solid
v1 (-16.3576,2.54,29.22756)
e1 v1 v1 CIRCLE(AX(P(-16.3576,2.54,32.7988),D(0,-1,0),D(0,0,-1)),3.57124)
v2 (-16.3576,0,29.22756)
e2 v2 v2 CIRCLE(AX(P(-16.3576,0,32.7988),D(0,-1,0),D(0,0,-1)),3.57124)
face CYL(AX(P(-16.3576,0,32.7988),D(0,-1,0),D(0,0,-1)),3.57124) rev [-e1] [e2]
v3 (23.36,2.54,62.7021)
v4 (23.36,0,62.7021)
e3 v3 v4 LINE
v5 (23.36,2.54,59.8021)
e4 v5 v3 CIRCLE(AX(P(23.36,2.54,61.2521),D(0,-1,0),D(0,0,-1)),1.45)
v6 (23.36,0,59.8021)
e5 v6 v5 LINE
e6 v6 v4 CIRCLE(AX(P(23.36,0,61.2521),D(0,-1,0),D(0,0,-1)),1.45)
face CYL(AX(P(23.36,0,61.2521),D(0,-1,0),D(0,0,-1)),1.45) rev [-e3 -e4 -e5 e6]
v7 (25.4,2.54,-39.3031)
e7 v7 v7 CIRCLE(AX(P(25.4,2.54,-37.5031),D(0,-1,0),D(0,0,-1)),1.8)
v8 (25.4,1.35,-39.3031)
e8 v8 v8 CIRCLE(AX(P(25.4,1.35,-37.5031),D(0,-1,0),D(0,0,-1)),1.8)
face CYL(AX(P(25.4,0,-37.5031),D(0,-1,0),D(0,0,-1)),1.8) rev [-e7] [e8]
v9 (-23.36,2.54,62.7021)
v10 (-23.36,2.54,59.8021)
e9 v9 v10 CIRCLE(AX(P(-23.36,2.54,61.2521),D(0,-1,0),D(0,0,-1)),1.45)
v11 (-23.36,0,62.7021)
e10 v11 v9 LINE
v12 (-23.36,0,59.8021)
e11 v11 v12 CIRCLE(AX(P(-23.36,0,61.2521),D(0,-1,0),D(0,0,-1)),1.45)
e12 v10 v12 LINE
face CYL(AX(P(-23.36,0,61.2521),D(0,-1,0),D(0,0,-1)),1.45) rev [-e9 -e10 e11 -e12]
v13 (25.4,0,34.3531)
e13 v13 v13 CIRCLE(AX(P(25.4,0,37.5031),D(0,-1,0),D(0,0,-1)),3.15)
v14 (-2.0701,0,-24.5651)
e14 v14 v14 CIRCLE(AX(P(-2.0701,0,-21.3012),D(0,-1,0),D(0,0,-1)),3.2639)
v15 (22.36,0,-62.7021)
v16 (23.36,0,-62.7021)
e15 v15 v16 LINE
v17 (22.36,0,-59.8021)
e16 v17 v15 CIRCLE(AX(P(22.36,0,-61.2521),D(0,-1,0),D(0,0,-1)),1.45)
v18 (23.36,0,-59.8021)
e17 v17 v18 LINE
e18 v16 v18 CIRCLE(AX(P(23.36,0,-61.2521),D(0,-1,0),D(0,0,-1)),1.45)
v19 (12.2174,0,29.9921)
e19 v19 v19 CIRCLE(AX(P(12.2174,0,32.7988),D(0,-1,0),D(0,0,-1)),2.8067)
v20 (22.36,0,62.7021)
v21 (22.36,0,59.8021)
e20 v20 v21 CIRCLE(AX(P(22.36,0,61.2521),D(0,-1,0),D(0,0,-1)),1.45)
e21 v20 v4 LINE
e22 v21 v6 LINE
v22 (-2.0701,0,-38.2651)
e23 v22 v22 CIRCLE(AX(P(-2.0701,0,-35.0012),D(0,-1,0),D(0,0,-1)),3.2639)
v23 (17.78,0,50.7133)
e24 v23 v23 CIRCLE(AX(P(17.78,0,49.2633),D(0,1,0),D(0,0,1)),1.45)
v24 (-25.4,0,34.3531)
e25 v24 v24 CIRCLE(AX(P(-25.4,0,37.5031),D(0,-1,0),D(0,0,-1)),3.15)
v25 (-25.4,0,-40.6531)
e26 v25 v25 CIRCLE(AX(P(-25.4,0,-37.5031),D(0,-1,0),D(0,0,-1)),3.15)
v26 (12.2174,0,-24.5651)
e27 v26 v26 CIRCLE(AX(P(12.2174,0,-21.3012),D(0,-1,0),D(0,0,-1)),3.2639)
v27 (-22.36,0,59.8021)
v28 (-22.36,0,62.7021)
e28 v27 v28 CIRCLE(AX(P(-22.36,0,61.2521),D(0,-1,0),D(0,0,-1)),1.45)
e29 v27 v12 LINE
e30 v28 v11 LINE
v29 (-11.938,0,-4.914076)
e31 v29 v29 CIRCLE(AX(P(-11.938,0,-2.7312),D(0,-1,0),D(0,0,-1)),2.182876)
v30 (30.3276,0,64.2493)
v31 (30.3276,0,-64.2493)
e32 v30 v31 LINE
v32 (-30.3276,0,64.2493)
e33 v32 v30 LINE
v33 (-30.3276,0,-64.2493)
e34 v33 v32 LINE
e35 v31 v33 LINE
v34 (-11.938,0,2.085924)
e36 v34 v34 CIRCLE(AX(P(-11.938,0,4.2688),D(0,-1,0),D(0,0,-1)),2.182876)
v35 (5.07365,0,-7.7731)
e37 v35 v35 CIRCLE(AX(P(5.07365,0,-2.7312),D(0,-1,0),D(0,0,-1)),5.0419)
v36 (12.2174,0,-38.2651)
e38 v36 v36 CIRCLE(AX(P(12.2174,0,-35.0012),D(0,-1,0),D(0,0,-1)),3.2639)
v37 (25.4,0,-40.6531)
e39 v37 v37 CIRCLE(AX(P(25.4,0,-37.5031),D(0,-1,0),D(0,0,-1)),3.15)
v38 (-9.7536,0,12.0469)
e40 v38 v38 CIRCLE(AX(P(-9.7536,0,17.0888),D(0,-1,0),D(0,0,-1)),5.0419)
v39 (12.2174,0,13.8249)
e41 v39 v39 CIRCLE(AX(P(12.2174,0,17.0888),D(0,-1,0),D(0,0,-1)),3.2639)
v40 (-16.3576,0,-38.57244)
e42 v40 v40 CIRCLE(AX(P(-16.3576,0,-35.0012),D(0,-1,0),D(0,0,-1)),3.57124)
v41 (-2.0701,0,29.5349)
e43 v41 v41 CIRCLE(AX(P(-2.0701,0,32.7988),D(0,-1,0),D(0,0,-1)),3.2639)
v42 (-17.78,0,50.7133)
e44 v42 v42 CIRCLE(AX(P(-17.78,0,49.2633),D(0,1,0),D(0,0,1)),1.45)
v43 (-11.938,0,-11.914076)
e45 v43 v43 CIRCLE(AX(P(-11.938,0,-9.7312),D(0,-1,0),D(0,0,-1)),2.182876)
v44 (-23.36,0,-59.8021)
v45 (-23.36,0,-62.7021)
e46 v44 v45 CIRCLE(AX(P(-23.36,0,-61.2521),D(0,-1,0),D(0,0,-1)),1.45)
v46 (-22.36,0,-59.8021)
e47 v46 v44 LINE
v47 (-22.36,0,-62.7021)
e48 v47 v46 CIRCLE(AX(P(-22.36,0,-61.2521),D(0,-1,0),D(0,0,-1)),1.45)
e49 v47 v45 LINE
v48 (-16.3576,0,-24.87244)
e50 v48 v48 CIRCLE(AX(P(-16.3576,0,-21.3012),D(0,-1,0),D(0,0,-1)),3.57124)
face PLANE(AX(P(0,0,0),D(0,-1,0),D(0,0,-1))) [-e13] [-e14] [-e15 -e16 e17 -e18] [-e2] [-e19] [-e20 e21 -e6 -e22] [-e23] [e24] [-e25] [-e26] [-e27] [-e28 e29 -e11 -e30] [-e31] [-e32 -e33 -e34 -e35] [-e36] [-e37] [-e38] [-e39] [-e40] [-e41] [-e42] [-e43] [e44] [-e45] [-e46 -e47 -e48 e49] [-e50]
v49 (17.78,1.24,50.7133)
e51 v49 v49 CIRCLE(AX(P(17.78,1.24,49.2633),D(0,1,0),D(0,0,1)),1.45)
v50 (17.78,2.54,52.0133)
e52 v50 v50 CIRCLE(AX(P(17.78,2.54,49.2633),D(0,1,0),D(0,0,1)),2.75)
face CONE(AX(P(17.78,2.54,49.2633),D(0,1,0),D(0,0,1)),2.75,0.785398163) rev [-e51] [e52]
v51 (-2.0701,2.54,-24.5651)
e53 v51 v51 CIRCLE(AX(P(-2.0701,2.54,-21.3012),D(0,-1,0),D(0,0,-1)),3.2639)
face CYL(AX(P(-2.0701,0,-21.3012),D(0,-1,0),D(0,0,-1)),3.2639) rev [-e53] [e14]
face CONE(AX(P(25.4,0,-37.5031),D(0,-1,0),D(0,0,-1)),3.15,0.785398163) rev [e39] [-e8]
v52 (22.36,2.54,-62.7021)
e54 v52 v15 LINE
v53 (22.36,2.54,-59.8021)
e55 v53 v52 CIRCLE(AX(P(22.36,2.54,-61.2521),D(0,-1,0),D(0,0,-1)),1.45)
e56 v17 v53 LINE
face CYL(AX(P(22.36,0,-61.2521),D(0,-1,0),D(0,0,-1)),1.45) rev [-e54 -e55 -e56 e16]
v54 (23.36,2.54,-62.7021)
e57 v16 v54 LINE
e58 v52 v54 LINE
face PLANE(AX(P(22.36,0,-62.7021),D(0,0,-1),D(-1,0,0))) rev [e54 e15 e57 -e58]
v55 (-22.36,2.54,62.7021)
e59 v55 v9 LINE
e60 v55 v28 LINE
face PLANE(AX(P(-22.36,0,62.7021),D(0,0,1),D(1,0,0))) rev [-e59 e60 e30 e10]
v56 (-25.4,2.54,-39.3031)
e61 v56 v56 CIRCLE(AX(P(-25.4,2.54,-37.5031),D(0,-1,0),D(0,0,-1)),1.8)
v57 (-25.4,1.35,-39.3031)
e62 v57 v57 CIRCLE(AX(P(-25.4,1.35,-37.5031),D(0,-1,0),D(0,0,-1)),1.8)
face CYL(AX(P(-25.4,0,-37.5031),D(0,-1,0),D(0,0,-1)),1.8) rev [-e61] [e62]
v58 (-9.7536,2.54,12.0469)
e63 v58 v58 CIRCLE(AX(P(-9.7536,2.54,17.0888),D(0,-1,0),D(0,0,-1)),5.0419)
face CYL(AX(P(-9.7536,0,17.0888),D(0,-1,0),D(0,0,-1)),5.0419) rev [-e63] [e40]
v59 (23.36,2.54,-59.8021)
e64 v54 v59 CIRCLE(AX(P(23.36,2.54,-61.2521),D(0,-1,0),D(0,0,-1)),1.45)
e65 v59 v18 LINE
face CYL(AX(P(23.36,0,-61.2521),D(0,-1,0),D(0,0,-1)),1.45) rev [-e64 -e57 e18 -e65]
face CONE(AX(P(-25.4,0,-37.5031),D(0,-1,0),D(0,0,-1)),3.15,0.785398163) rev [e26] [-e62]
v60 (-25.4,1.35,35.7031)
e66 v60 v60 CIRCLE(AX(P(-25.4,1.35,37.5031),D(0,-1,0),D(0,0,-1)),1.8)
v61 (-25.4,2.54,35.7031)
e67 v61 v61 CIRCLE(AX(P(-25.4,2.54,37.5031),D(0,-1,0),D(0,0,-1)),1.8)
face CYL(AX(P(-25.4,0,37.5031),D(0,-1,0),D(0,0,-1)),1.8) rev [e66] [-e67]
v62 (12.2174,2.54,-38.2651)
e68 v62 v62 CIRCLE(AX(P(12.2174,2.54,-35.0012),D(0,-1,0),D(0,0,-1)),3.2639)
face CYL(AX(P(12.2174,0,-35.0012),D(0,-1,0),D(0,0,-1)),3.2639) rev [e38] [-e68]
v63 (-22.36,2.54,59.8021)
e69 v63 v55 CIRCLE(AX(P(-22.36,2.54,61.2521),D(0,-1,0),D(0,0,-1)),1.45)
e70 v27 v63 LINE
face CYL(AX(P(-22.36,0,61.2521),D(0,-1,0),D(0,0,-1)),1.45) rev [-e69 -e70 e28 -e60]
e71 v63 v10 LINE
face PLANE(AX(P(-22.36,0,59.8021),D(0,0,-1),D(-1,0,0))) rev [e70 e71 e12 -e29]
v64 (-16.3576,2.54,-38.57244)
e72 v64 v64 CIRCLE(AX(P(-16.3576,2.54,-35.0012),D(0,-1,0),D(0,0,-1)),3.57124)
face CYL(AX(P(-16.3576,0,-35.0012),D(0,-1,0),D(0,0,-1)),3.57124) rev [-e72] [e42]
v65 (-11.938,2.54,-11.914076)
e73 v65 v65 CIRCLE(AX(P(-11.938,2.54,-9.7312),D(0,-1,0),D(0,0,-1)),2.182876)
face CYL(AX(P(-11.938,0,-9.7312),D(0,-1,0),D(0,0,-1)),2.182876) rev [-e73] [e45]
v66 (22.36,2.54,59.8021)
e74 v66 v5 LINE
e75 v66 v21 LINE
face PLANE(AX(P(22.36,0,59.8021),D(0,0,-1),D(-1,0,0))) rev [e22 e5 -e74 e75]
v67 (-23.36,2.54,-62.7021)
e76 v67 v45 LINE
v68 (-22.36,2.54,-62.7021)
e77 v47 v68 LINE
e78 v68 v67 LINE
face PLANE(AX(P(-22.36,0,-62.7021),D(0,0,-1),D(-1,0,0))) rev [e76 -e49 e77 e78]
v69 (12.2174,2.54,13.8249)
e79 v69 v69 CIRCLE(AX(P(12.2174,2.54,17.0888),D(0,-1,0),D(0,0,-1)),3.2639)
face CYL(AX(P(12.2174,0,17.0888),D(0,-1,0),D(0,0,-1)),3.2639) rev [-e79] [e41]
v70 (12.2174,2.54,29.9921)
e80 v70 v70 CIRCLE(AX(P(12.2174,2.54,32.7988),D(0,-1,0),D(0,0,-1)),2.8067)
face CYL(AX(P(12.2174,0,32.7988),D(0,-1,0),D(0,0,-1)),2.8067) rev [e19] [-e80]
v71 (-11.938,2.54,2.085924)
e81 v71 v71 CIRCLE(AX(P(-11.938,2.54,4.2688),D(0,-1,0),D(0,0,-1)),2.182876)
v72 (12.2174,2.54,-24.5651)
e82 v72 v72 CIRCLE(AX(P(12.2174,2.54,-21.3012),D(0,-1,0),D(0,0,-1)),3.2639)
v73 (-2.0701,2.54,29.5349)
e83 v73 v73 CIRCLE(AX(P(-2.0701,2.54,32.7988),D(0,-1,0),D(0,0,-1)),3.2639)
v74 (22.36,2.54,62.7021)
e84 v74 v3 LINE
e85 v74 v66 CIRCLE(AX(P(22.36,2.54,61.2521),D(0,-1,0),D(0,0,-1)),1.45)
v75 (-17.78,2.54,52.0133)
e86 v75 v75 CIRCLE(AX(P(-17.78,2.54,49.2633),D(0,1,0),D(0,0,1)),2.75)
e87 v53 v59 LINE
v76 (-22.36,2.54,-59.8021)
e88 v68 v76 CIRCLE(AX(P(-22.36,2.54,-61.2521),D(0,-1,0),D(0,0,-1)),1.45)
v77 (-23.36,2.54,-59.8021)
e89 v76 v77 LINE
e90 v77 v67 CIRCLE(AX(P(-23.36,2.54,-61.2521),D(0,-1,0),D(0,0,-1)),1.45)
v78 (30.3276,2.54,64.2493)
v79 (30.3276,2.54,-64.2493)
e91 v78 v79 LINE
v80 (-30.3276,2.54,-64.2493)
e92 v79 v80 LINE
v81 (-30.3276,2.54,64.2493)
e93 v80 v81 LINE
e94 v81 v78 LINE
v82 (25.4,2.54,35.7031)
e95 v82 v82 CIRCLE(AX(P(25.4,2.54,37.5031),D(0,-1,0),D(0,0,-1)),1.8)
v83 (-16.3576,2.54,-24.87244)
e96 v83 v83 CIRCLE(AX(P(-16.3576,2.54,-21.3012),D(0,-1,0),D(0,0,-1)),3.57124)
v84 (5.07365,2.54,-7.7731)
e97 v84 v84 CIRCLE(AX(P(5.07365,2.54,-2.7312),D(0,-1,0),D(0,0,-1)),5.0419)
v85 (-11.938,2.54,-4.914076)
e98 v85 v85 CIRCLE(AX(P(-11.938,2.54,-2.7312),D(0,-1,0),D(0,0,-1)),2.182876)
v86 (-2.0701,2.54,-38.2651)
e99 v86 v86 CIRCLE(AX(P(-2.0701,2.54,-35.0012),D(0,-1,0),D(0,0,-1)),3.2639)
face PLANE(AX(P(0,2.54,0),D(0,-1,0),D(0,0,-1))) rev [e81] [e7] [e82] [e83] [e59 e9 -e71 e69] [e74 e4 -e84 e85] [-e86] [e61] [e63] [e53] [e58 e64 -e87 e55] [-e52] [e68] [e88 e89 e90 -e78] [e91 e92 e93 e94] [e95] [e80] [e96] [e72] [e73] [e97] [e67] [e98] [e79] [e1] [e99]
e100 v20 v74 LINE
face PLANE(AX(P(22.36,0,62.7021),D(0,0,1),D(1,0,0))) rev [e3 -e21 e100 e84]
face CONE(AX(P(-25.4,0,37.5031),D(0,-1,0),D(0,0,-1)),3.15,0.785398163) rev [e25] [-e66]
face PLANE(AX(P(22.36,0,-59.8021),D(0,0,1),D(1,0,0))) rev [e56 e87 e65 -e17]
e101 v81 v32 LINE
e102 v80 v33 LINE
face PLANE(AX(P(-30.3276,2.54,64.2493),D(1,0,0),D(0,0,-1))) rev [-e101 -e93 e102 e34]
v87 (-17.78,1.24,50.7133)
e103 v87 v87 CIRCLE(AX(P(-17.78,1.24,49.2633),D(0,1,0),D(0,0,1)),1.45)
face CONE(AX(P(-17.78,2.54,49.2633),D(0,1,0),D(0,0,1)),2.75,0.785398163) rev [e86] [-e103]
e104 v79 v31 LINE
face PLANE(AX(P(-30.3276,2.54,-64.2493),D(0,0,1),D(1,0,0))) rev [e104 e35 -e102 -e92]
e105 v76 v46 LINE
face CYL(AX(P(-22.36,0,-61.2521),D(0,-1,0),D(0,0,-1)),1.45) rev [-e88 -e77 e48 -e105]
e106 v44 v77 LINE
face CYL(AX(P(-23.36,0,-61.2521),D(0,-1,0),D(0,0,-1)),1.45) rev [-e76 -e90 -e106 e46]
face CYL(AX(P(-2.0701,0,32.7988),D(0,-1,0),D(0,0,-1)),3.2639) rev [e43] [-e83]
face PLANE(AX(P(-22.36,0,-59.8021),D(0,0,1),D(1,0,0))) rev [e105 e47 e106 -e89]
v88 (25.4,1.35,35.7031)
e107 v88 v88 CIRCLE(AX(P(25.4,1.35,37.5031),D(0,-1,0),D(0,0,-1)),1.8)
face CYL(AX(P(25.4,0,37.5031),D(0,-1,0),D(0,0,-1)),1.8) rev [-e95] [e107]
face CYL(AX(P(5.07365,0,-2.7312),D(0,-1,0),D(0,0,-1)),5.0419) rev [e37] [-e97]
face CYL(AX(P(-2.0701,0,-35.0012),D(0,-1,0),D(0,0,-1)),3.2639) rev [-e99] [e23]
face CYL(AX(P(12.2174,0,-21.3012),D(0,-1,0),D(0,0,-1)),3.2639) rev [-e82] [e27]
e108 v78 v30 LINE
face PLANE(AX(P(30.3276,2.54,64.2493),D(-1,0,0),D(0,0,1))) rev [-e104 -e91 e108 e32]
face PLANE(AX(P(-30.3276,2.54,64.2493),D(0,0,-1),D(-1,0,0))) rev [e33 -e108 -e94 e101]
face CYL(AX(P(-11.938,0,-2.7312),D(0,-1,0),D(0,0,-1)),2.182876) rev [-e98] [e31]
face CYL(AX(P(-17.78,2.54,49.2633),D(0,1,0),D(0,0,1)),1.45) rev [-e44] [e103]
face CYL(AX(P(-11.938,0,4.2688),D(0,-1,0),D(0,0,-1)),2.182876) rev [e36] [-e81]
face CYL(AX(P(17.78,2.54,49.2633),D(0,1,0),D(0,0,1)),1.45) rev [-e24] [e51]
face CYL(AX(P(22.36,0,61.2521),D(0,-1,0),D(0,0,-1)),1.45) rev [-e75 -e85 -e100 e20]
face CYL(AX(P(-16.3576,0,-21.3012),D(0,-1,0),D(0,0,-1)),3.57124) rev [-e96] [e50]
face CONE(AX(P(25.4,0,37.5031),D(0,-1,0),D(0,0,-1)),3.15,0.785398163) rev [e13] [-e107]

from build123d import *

# Parameters (mm, degrees)
SKETCH1_W                                      = 60.6552
SKETCH1_H                                      = 128.4986
BOSS_EXTRUDE1_DEPTH                            = 2.54
CSK_FOR_M3_FLAT_HEAD_MACHINE_SCREW1_AT_2_COUNT = 2
CSK_FOR_M3_FLAT_HEAD_MACHINE_SCREW1_AT_2_PITCH = 75.0062
M2_5_CLEARANCE_SLOT1_DEPTH                     = 2.54
F_1_4_CLEARANCE_HOLE1_D                        = 7.14248
F_1_4_CLEARANCE_HOLE2_D                        = 6.5278
F_3_8_CLEARANCE_HOLE2_D                        = 10.0838
F_10_CLEARANCE_HOLE1_D                         = 5.6134
CSK_FOR_M2_5_FLAT_HEAD_MACHINE_SCREW1_AT_COUNT = 2
CSK_FOR_M2_5_FLAT_HEAD_MACHINE_SCREW1_AT_PITCH = 35.56
F_11_64_0_17188_DIAMETER_HOLE1_D               = 4.365752


# Read off the part's stored shape, not the designer's step: M2.5 Clearance Slot1
with BuildPart() as part:
    # Sketch1 → Boss-Extrude1 (new body)
    with BuildSketch(Plane(origin=(0, 0, 0), x_dir=(1, 0, 0), z_dir=(0, 1, 0))):
        Rectangle(SKETCH1_W, SKETCH1_H)
    extrude(amount=BOSS_EXTRUDE1_DEPTH)

    # Sketch5 → CSK for M3 Flat Head Machine Screw1 (revolve, cut)
    with BuildSketch(Plane(origin=(25.4, 0, -37.5031), x_dir=(0, 0, -1), z_dir=(1, 0, 0))):
        Polygon((0, 0), (0, 2.54), (1.8, 2.54), (1.8, 1.35), (3.15, 0), align=None)
    csk_for_m3_flat_head_machine_screw1 = revolve(axis=Axis((25.4, -6.35, -37.5031), (0, 1, 0)), mode=Mode.SUBTRACT)

    # CSK for M3 Flat Head Machine Screw1 at 2: CSK for M3 Flat Head Machine Screw1 ×2
    with Locations(*[(0, 0, i * CSK_FOR_M3_FLAT_HEAD_MACHINE_SCREW1_AT_2_PITCH) for i in range(1, CSK_FOR_M3_FLAT_HEAD_MACHINE_SCREW1_AT_2_COUNT)]):
        add(csk_for_m3_flat_head_machine_screw1, mode=Mode.SUBTRACT)

    # M2.5 Clearance Slot1 outline → M2.5 Clearance Slot1 (cut)
    with BuildSketch(Plane(origin=(0, 0, 0), x_dir=(1, 0, 0), z_dir=(0, 1, 0))):
        with BuildLine():
            ThreePointArc((23.36, -62.7021), (24.81, -61.2521), (23.36, -59.8021))
            Line((23.36, -59.8021), (22.36, -59.8021))
            ThreePointArc((22.36, -59.8021), (20.91, -61.2521), (22.36, -62.7021))
            Line((22.36, -62.7021), (23.36, -62.7021))
        make_face()
        with BuildLine():
            ThreePointArc((23.36, 59.8021), (24.81, 61.2521), (23.36, 62.7021))
            Line((23.36, 62.7021), (22.36, 62.7021))
            ThreePointArc((22.36, 62.7021), (20.91, 61.2521), (22.36, 59.8021))
            Line((22.36, 59.8021), (23.36, 59.8021))
        make_face()
    m2_5_clearance_slot1 = extrude(amount=M2_5_CLEARANCE_SLOT1_DEPTH, mode=Mode.SUBTRACT)

    # Mirror1: CSK for M3 Flat Head Machine Screw1, M2.5 Clearance Slot1 across plane
    add(csk_for_m3_flat_head_machine_screw1.mirror(Plane(origin=(0, 0, 0), x_dir=(0, 0, 1), z_dir=(1, 0, 0))), mode=Mode.SUBTRACT)
    add(m2_5_clearance_slot1.mirror(Plane(origin=(0, 0, 0), x_dir=(0, 0, 1), z_dir=(1, 0, 0))), mode=Mode.SUBTRACT)

    # Mirror1 copy 1 sketch → Mirror1 copy 1 (revolve, cut)
    with BuildSketch(Plane(origin=(-25.4, 0, 37.5031), x_dir=(0, 0, -1), z_dir=(-1, 0, 0))):
        Polygon((0, 0), (0, -2.54), (1.8, -2.54), (1.8, -1.35), (3.15, 0), align=None)
    revolve(axis=Axis((-25.4, -6.35, 37.5031), (0, -1, 0)), mode=Mode.SUBTRACT)

    # 1/4 Clearance Hole1 (through all)
    with Locations(Plane(origin=(0, 0, 0), x_dir=(-1, 0, 0), z_dir=(0, -1, 0))):
        with Locations((16.3576, 35.0012), (16.3576, 21.301199968), (16.3576, -32.798800036)):
            Hole(F_1_4_CLEARANCE_HOLE1_D / 2)

    # 1/4 Clearance Hole2 (through all)
    with Locations(Plane(origin=(0, 0, 0), x_dir=(-1, 0, 0), z_dir=(0, -1, 0))):
        with Locations((-12.2174, 35.0012), (2.0701, 35.0012), (2.0701, 21.301199968), (-12.2174, 21.301199968), (-12.2174, -17.08879996), (2.0701, -32.798800036)):
            Hole(F_1_4_CLEARANCE_HOLE2_D / 2)

    # 3/8 Clearance Hole2 (through all)
    with Locations(Plane(origin=(0, 0, 0), x_dir=(-1, 0, 0), z_dir=(0, -1, 0))):
        with Locations((9.7536, -17.08879996), (-5.07365, 2.731200024)):
            Hole(F_3_8_CLEARANCE_HOLE2_D / 2)

    # #10 Clearance Hole1 (through all)
    with Locations(Plane(origin=(0, 0, 0), x_dir=(-1, 0, 0), z_dir=(0, -1, 0))):
        with Locations((-12.2174, -32.798800036)):
            Hole(F_10_CLEARANCE_HOLE1_D / 2)

    # Sketch73 → CSK for M2.5 Flat Head Machine Screw1 (revolve, cut)
    with BuildSketch(Plane(origin=(-17.78, 2.54, 49.2633), x_dir=(0, 0, 1), z_dir=(1, 0, 0))):
        Polygon((0, 0), (0, 2.54), (1.45, 2.54), (1.45, 1.3), (2.75, 0), align=None)
    csk_for_m2_5_flat_head_machine_screw1 = revolve(axis=Axis((-17.78, 8.89, 49.2633), (0, -1, 0)), mode=Mode.SUBTRACT)

    # CSK for M2.5 Flat Head Machine Screw1 at: CSK for M2.5 Flat Head Machine Screw1 ×2
    with Locations(*[(i * CSK_FOR_M2_5_FLAT_HEAD_MACHINE_SCREW1_AT_PITCH, 0, 0) for i in range(1, CSK_FOR_M2_5_FLAT_HEAD_MACHINE_SCREW1_AT_COUNT)]):
        add(csk_for_m2_5_flat_head_machine_screw1, mode=Mode.SUBTRACT)

    # 11/64 (0.17188) Diameter Hole1 (through all)
    with Locations(Plane(origin=(0, 0, 0), x_dir=(-1, 0, 0), z_dir=(0, -1, 0))):
        with Locations((11.938, 9.731199994), (11.938, 2.731200024), (11.938, -4.268799946)):
            Hole(F_11_64_0_17188_DIAMETER_HOLE1_D / 2)


solid = part.part
